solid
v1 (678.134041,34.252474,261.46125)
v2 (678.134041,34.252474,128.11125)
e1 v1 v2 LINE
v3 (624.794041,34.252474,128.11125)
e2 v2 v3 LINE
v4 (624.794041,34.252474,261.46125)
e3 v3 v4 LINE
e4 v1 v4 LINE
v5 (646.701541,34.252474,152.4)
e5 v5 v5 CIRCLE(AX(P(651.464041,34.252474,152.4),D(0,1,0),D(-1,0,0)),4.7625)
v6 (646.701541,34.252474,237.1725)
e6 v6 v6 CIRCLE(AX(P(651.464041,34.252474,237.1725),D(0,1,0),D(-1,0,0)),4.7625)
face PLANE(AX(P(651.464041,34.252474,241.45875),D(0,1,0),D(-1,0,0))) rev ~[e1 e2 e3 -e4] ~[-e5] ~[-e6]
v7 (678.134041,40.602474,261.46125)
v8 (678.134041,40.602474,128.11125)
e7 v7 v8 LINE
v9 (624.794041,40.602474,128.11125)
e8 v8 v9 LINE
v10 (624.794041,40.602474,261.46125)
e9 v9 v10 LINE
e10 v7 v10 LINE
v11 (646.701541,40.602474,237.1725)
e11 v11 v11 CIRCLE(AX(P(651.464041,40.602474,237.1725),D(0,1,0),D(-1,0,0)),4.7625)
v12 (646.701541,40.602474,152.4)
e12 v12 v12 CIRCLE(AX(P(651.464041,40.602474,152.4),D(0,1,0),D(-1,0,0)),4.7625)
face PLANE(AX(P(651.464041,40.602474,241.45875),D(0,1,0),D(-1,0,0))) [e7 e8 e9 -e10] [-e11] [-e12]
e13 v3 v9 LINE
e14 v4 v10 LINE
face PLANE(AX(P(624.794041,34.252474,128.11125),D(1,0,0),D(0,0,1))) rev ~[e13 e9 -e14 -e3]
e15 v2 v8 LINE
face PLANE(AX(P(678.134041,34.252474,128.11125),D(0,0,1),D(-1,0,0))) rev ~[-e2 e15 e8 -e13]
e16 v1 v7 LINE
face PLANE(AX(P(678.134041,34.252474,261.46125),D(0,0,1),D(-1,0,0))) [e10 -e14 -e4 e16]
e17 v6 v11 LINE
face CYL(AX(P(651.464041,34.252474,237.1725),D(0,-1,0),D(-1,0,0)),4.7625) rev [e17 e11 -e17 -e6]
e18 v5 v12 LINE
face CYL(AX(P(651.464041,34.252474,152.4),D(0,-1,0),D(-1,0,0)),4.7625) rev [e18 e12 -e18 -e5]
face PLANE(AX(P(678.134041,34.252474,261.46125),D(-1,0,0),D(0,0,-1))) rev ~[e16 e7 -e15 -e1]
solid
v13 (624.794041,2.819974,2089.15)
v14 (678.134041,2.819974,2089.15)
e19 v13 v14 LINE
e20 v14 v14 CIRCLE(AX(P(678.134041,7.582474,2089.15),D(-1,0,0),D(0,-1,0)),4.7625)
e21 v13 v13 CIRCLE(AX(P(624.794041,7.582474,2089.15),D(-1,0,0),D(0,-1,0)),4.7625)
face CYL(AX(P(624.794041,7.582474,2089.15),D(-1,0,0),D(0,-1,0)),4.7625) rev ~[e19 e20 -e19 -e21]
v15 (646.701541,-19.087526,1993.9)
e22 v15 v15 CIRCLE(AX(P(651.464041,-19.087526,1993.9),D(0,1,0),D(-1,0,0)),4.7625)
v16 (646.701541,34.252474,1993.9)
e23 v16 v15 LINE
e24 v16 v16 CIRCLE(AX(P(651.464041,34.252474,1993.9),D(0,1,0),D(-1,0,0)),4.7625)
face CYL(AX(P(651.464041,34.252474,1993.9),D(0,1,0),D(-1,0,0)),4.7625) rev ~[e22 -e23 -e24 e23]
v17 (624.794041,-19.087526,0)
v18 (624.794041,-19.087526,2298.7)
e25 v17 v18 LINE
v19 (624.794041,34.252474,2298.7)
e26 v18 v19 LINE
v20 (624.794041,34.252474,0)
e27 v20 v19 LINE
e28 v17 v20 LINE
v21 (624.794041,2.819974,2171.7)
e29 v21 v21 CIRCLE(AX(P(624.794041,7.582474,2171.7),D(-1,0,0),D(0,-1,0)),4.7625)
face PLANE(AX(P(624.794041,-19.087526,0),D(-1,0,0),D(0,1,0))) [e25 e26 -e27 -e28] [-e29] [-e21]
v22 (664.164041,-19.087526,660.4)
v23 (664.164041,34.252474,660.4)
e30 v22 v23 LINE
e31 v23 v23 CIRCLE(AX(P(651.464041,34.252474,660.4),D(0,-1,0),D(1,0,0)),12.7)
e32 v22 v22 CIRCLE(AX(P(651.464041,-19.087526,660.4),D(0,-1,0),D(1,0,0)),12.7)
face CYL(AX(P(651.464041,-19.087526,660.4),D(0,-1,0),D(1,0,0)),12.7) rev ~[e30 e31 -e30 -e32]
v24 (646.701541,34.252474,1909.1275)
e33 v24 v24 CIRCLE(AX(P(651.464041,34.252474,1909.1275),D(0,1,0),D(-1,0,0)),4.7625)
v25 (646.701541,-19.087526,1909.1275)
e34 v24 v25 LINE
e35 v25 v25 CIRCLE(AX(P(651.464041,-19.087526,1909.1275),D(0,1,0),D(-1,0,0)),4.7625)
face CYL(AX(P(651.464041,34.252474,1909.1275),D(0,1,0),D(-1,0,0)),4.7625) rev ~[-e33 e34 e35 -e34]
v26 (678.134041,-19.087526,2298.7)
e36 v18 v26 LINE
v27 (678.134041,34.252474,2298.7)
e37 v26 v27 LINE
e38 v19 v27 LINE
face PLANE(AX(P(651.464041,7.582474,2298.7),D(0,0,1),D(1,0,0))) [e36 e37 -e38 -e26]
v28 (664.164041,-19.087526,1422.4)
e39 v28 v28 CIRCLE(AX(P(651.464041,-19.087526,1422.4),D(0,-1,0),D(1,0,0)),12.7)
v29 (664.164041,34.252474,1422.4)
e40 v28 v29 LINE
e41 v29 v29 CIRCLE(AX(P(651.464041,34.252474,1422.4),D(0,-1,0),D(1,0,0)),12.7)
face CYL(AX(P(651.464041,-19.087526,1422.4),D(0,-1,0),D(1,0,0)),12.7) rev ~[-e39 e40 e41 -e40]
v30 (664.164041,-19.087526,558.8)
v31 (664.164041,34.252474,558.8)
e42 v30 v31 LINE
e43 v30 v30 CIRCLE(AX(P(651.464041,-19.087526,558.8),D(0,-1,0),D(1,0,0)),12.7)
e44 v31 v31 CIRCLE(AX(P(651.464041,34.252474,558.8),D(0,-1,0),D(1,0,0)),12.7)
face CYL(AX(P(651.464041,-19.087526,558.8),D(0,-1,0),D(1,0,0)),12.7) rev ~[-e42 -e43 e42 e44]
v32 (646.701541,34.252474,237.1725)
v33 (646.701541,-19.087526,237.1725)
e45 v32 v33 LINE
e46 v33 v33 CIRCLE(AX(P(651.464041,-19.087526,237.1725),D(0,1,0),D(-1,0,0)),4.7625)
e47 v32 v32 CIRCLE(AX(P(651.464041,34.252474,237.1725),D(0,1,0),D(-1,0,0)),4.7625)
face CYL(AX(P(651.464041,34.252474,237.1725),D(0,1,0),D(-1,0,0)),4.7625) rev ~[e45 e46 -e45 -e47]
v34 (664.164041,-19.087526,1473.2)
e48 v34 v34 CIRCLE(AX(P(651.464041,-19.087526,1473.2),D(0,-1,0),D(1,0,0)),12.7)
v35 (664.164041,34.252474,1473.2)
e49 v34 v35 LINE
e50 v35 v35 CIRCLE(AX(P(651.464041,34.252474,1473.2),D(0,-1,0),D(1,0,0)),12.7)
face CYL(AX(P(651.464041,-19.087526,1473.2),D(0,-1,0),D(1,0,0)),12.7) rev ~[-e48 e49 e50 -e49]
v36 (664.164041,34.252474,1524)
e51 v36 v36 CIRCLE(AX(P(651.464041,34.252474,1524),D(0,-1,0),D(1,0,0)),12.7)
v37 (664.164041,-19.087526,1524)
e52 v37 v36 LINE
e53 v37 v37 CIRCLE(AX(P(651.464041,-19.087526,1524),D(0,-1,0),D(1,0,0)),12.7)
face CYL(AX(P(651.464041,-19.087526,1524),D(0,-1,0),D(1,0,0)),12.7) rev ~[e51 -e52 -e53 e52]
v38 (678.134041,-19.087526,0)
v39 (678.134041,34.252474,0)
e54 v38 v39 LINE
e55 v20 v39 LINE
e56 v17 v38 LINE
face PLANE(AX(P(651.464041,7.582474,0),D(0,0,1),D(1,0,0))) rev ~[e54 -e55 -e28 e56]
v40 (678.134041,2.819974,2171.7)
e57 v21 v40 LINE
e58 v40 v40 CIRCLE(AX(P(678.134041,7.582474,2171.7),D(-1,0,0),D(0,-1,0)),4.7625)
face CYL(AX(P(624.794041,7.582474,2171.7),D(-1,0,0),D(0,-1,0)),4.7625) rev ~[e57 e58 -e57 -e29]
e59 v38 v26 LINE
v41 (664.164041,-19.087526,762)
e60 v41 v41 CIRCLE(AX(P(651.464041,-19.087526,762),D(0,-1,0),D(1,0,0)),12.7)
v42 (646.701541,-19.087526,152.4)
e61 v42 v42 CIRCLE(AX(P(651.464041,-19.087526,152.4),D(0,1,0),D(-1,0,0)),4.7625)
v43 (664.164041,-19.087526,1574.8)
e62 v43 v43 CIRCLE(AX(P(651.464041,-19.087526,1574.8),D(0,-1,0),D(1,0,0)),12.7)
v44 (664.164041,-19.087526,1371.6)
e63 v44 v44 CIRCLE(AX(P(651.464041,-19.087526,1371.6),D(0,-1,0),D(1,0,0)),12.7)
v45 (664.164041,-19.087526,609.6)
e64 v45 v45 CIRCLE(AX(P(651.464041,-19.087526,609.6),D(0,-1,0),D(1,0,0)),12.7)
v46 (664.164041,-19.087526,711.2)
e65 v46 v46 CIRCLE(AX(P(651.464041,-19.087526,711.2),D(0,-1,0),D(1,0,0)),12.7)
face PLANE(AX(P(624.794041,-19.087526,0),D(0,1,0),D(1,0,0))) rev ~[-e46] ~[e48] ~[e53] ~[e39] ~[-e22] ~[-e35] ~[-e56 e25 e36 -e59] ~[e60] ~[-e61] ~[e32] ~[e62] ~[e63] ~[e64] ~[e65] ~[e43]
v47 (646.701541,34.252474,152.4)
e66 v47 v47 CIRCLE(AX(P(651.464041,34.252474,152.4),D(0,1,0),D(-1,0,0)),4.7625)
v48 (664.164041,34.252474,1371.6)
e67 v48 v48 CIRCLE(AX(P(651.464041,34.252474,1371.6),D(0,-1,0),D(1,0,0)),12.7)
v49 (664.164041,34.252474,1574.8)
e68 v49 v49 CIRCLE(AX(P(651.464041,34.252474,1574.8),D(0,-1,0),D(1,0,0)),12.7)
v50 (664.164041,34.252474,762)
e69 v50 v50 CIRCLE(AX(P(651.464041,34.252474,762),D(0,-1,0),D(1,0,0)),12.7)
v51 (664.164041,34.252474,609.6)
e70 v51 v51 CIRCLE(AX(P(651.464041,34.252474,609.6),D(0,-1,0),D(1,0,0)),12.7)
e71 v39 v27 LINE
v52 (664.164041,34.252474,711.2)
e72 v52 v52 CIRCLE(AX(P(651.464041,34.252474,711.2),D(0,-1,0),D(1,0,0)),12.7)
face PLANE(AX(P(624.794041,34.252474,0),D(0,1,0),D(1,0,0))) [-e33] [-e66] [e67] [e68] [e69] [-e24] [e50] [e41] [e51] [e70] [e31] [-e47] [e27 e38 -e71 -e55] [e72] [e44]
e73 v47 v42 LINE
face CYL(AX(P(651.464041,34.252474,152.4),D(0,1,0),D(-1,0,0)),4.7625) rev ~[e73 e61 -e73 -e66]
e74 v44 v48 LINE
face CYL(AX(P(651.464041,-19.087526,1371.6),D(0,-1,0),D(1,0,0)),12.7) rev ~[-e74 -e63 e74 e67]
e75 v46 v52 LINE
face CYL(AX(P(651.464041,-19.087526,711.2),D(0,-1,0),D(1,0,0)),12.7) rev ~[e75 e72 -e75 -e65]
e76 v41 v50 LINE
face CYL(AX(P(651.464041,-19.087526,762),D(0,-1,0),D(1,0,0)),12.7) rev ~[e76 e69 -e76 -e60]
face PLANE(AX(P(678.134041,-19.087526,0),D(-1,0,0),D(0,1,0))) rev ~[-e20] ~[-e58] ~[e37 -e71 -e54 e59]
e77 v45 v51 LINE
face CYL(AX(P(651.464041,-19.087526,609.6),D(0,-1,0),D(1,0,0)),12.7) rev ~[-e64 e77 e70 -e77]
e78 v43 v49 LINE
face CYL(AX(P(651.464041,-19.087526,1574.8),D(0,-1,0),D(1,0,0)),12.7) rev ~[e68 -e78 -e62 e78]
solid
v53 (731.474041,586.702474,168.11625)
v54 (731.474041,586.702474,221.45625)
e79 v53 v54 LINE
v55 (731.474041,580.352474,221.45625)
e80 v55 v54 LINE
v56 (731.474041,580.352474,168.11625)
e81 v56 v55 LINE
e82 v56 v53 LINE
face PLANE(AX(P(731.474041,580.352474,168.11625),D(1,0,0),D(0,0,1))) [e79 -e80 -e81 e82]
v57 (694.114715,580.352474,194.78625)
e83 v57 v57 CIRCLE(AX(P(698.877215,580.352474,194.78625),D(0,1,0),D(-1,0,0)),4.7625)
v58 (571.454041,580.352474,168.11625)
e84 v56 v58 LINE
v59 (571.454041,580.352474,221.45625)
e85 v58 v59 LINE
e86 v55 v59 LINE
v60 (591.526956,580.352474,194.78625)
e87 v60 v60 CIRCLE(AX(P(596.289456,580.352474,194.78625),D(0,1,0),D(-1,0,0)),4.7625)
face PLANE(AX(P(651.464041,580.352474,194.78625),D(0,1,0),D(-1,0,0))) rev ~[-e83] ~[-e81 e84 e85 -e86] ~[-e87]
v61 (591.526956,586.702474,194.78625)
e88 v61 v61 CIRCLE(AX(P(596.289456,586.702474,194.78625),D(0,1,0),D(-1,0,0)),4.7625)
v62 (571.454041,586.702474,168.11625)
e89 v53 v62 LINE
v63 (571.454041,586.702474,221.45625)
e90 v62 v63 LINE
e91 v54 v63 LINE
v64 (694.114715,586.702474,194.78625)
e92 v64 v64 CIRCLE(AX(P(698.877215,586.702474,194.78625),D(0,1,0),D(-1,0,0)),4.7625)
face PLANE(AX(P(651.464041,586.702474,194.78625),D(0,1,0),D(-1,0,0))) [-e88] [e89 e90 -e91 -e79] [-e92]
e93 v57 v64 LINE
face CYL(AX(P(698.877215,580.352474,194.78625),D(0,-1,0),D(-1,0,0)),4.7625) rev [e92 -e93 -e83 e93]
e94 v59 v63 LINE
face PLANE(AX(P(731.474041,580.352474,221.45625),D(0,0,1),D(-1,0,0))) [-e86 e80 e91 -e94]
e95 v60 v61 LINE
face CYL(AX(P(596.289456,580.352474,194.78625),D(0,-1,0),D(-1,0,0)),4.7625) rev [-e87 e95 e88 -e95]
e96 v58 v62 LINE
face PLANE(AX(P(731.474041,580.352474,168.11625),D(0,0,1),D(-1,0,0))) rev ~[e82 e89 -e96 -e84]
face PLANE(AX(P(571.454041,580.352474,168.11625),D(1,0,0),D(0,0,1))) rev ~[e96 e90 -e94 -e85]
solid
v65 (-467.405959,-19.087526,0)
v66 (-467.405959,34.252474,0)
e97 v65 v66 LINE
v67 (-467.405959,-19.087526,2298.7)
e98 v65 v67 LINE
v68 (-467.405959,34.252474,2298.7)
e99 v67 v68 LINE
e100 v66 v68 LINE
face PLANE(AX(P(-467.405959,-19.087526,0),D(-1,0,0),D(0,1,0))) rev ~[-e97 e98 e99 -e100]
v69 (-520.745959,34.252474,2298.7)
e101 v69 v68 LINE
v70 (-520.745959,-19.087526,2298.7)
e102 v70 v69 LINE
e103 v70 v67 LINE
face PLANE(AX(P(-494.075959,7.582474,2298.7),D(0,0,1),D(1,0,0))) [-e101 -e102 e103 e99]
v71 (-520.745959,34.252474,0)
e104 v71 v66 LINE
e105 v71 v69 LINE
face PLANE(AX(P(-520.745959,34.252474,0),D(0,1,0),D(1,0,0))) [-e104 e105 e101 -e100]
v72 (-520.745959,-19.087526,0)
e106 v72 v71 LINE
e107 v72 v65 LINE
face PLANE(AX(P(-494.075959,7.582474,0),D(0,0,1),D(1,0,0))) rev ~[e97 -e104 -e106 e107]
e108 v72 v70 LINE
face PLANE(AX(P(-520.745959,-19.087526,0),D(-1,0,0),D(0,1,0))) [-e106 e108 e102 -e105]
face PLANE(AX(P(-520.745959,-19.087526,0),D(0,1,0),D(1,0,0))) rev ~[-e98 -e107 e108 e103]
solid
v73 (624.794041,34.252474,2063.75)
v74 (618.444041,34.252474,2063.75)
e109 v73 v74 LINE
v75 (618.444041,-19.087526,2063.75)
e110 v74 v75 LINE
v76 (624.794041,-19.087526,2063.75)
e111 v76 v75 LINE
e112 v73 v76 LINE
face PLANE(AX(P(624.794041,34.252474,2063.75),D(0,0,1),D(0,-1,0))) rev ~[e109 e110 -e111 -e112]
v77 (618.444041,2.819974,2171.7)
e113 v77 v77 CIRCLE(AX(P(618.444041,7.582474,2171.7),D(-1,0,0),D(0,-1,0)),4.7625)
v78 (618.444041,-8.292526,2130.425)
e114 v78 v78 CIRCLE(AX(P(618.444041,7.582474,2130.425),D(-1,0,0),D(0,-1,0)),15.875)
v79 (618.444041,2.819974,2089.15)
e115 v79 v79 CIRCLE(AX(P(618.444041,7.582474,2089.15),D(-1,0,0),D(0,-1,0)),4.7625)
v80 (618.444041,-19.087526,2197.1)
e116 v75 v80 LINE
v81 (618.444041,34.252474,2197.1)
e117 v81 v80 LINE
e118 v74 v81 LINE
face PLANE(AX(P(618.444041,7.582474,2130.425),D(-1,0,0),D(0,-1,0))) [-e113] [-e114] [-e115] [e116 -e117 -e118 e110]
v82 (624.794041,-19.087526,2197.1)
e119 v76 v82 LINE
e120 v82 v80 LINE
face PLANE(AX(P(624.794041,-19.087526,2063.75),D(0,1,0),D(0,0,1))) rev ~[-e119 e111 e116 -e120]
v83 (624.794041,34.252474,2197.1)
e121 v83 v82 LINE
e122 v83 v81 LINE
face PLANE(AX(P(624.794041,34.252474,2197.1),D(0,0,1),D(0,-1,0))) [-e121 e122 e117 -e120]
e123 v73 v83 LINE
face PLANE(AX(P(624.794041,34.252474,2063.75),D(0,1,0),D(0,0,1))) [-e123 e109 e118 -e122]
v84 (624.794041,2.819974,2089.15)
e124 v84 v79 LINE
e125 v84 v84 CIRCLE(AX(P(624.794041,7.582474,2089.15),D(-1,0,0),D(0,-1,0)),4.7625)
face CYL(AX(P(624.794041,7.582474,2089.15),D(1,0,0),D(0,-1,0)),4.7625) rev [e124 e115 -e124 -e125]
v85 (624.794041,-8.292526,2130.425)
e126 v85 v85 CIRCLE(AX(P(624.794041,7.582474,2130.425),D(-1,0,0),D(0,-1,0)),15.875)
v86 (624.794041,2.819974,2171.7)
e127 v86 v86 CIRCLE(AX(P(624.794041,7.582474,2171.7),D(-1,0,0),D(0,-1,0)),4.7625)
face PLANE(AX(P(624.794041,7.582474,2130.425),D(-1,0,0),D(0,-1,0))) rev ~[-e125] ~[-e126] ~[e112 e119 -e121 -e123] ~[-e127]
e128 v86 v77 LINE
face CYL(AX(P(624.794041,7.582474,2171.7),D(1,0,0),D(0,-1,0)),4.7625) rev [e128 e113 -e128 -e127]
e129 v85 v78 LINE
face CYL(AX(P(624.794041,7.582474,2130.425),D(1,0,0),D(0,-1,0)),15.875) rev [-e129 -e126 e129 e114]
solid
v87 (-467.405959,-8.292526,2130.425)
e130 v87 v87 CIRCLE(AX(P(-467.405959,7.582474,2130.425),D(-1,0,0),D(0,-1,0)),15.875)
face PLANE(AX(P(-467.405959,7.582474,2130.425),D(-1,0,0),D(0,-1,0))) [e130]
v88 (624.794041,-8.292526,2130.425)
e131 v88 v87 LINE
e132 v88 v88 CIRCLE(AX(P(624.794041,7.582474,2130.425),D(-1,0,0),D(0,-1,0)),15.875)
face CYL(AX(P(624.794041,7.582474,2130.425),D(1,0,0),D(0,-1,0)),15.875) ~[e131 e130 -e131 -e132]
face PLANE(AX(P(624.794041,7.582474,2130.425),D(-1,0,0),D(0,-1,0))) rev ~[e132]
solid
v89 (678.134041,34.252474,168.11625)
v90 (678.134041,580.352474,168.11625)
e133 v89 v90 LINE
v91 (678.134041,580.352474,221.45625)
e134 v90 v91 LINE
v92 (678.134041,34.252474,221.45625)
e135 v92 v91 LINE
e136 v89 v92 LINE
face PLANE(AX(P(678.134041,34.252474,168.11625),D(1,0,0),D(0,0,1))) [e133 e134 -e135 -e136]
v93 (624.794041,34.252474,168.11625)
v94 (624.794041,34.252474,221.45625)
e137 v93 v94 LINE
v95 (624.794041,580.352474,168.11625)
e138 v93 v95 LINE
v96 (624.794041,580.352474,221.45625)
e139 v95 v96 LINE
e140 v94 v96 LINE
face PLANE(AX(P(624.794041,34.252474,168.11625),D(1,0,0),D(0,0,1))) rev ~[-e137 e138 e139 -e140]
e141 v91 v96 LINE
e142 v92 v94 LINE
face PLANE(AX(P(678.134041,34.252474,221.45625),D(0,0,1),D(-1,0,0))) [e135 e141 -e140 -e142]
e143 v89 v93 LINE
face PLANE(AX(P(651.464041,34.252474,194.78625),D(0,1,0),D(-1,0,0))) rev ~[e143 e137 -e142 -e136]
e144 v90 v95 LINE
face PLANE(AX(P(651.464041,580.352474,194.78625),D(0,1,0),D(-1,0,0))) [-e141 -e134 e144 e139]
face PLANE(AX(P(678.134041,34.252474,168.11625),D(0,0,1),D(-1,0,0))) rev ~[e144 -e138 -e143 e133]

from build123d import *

# Parameters (mm, degrees)
F0_W      = 53.34
F0_H      = 53.34
F1_DEPTH  = 2298.7
F2_W      = 53.34
F2_H      = 40.005
F2_R      = 4.7625
F2_H_2    = 53.34
F3_DEPTH  = 6.35
F4_DEPTH  = 546.1
F5_W      = 160.02
F5_H      = 53.34
F5_R      = 4.7625
F6_DEPTH  = 6.35
F7_DEPTH  = 53.341
F8_W      = 53.34
F8_H      = 133.35
F8_R      = 4.7625
F8_R_2    = 15.875
F9_DEPTH  = 6.35
F10_DEPTH = 1092.2
F11_DEPTH = 106.681
F12_R     = 12.7
F13_DEPTH = 605.791


# Not quite as in the source:
# - a feature names something its author has since deleted; it is built from what else it names


with BuildPart() as f1:
    # F0 (on Top) → F1 (new body)
    with BuildSketch(Plane.XY):
        with Locations((-494.0759591283, 7.5824735198)):
            Rectangle(F0_W, F0_H)
    extrude(amount=F1_DEPTH)


with BuildPart() as f1b:
    # F0 (on Top) → F1, piece 2 (new body)
    with BuildSketch(Plane.XY):
        with Locations((651.4640408717, 7.5824735198)):
            Rectangle(F0_W, F0_H)
    extrude(amount=F1_DEPTH)

    # F2 (on face) → F7 (cut, through all)
    with BuildSketch(Plane(origin=(0, 34.2524735198, 0), x_dir=(-1, 0, 0), z_dir=(0, 1, 0))):
        with Locations((-651.4640408717, 237.1725)):
            Circle(F2_R)
        with Locations((-651.4640408717, 152.4)):
            Circle(F2_R)
        with Locations((-651.4640408717, 1993.9)):
            Circle(F2_R)
        with Locations((-651.4640408717, 1909.1275)):
            Circle(F2_R)
    extrude(amount=-F7_DEPTH, mode=Mode.SUBTRACT)

    # F8 (on face) → F11 (cut, through all)
    with BuildSketch(Plane(origin=(624.7940408717, 0, 0), x_dir=(0, -1, 0), z_dir=(-1, 0, 0))):
        with Locations((-7.5824735198, 2171.7)):
            Circle(F8_R)
        with Locations((-7.5824735198, 2089.15)):
            Circle(F8_R)
    extrude(amount=-F11_DEPTH, mode=Mode.SUBTRACT)

    # F12 (on face) → F13 (cut, through all)
    with BuildSketch(Plane.XZ.offset(19.0875264802)):
        with Locations((651.4640408717, 558.8)):
            Circle(F12_R)
        with Locations((651.4640408717, 609.6)):
            Circle(F12_R)
        with Locations((651.4640408717, 660.4)):
            Circle(F12_R)
        with Locations((651.4640408717, 711.2)):
            Circle(F12_R)
        with Locations((651.4640408717, 762)):
            Circle(F12_R)
        with Locations((651.4640408717, 1371.6)):
            Circle(F12_R)
        with Locations((651.4640408717, 1422.4)):
            Circle(F12_R)
        with Locations((651.4640408717, 1473.2)):
            Circle(F12_R)
        with Locations((651.4640408717, 1524)):
            Circle(F12_R)
        with Locations((651.4640408717, 1574.8)):
            Circle(F12_R)
    extrude(amount=-F13_DEPTH, mode=Mode.SUBTRACT)


with BuildPart() as f3:
    # F2 (on face) → F3 (new body)
    with BuildSketch(Plane(origin=(0, 34.2524735198, 0), x_dir=(-1, 0, 0), z_dir=(0, 1, 0))):
        with Locations((-651.4640408717, 241.45875)):
            Rectangle(F2_W, F2_H)
        with Locations((-651.4640408717, 237.1725)):
            Circle(F2_R, mode=Mode.SUBTRACT)
        with Locations((-651.4640408717, 194.78625)):
            Rectangle(F2_W, F2_H_2)
        with Locations((-651.4640408717, 148.11375)):
            Rectangle(F2_W, F2_H)
        with Locations((-651.4640408717, 152.4)):
            Circle(F2_R, mode=Mode.SUBTRACT)
    extrude(amount=F3_DEPTH)


with BuildPart() as f4:
    # F2 (on face) → F4 (new body)
    with BuildSketch(Plane(origin=(0, 34.2524735198, 0), x_dir=(-1, 0, 0), z_dir=(0, 1, 0))):
        with Locations((-651.4640408717, 194.78625)):
            Rectangle(F2_W, F2_H_2)
    extrude(amount=F4_DEPTH)


with BuildPart() as f6:
    # F5 (on face) → F6 (new body)
    with BuildSketch(Plane(origin=(0, 580.3524735198, 0), x_dir=(-1, 0, 0), z_dir=(0, 1, 0))):
        with Locations((-651.4640408717, 194.78625)):
            Rectangle(F5_W, F5_H)
        with Locations((-698.8772153854, 194.78625)):
            Circle(F5_R, mode=Mode.SUBTRACT)
        with Locations((-596.2894558907, 194.78625)):
            Circle(F5_R, mode=Mode.SUBTRACT)
    extrude(amount=F6_DEPTH)


with BuildPart() as f9:
    # F8 (on face) → F9 (new body)
    with BuildSketch(Plane(origin=(624.7940408717, 0, 0), x_dir=(0, -1, 0), z_dir=(-1, 0, 0))):
        with Locations((-7.5824735198, 2130.425)):
            Rectangle(F8_W, F8_H)
        with Locations((-7.5824735198, 2089.15)):
            Circle(F8_R, mode=Mode.SUBTRACT)
        with Locations((-7.5824735198, 2130.425)):
            Circle(F8_R_2, mode=Mode.SUBTRACT)
        with Locations((-7.5824735198, 2171.7)):
            Circle(F8_R, mode=Mode.SUBTRACT)
    extrude(amount=F9_DEPTH)


with BuildPart() as f10:
    # F8 (on face) → F10 (new body, through all)
    with BuildSketch(Plane(origin=(624.7940408717, 0, 0), x_dir=(0, -1, 0), z_dir=(-1, 0, 0))):
        with Locations((-7.5824735198, 2130.425)):
            Circle(F8_R_2)
    extrude(amount=F10_DEPTH)


solid = Compound([f1.part, f1b.part, f3.part, f4.part, f6.part, f9.part, f10.part])
